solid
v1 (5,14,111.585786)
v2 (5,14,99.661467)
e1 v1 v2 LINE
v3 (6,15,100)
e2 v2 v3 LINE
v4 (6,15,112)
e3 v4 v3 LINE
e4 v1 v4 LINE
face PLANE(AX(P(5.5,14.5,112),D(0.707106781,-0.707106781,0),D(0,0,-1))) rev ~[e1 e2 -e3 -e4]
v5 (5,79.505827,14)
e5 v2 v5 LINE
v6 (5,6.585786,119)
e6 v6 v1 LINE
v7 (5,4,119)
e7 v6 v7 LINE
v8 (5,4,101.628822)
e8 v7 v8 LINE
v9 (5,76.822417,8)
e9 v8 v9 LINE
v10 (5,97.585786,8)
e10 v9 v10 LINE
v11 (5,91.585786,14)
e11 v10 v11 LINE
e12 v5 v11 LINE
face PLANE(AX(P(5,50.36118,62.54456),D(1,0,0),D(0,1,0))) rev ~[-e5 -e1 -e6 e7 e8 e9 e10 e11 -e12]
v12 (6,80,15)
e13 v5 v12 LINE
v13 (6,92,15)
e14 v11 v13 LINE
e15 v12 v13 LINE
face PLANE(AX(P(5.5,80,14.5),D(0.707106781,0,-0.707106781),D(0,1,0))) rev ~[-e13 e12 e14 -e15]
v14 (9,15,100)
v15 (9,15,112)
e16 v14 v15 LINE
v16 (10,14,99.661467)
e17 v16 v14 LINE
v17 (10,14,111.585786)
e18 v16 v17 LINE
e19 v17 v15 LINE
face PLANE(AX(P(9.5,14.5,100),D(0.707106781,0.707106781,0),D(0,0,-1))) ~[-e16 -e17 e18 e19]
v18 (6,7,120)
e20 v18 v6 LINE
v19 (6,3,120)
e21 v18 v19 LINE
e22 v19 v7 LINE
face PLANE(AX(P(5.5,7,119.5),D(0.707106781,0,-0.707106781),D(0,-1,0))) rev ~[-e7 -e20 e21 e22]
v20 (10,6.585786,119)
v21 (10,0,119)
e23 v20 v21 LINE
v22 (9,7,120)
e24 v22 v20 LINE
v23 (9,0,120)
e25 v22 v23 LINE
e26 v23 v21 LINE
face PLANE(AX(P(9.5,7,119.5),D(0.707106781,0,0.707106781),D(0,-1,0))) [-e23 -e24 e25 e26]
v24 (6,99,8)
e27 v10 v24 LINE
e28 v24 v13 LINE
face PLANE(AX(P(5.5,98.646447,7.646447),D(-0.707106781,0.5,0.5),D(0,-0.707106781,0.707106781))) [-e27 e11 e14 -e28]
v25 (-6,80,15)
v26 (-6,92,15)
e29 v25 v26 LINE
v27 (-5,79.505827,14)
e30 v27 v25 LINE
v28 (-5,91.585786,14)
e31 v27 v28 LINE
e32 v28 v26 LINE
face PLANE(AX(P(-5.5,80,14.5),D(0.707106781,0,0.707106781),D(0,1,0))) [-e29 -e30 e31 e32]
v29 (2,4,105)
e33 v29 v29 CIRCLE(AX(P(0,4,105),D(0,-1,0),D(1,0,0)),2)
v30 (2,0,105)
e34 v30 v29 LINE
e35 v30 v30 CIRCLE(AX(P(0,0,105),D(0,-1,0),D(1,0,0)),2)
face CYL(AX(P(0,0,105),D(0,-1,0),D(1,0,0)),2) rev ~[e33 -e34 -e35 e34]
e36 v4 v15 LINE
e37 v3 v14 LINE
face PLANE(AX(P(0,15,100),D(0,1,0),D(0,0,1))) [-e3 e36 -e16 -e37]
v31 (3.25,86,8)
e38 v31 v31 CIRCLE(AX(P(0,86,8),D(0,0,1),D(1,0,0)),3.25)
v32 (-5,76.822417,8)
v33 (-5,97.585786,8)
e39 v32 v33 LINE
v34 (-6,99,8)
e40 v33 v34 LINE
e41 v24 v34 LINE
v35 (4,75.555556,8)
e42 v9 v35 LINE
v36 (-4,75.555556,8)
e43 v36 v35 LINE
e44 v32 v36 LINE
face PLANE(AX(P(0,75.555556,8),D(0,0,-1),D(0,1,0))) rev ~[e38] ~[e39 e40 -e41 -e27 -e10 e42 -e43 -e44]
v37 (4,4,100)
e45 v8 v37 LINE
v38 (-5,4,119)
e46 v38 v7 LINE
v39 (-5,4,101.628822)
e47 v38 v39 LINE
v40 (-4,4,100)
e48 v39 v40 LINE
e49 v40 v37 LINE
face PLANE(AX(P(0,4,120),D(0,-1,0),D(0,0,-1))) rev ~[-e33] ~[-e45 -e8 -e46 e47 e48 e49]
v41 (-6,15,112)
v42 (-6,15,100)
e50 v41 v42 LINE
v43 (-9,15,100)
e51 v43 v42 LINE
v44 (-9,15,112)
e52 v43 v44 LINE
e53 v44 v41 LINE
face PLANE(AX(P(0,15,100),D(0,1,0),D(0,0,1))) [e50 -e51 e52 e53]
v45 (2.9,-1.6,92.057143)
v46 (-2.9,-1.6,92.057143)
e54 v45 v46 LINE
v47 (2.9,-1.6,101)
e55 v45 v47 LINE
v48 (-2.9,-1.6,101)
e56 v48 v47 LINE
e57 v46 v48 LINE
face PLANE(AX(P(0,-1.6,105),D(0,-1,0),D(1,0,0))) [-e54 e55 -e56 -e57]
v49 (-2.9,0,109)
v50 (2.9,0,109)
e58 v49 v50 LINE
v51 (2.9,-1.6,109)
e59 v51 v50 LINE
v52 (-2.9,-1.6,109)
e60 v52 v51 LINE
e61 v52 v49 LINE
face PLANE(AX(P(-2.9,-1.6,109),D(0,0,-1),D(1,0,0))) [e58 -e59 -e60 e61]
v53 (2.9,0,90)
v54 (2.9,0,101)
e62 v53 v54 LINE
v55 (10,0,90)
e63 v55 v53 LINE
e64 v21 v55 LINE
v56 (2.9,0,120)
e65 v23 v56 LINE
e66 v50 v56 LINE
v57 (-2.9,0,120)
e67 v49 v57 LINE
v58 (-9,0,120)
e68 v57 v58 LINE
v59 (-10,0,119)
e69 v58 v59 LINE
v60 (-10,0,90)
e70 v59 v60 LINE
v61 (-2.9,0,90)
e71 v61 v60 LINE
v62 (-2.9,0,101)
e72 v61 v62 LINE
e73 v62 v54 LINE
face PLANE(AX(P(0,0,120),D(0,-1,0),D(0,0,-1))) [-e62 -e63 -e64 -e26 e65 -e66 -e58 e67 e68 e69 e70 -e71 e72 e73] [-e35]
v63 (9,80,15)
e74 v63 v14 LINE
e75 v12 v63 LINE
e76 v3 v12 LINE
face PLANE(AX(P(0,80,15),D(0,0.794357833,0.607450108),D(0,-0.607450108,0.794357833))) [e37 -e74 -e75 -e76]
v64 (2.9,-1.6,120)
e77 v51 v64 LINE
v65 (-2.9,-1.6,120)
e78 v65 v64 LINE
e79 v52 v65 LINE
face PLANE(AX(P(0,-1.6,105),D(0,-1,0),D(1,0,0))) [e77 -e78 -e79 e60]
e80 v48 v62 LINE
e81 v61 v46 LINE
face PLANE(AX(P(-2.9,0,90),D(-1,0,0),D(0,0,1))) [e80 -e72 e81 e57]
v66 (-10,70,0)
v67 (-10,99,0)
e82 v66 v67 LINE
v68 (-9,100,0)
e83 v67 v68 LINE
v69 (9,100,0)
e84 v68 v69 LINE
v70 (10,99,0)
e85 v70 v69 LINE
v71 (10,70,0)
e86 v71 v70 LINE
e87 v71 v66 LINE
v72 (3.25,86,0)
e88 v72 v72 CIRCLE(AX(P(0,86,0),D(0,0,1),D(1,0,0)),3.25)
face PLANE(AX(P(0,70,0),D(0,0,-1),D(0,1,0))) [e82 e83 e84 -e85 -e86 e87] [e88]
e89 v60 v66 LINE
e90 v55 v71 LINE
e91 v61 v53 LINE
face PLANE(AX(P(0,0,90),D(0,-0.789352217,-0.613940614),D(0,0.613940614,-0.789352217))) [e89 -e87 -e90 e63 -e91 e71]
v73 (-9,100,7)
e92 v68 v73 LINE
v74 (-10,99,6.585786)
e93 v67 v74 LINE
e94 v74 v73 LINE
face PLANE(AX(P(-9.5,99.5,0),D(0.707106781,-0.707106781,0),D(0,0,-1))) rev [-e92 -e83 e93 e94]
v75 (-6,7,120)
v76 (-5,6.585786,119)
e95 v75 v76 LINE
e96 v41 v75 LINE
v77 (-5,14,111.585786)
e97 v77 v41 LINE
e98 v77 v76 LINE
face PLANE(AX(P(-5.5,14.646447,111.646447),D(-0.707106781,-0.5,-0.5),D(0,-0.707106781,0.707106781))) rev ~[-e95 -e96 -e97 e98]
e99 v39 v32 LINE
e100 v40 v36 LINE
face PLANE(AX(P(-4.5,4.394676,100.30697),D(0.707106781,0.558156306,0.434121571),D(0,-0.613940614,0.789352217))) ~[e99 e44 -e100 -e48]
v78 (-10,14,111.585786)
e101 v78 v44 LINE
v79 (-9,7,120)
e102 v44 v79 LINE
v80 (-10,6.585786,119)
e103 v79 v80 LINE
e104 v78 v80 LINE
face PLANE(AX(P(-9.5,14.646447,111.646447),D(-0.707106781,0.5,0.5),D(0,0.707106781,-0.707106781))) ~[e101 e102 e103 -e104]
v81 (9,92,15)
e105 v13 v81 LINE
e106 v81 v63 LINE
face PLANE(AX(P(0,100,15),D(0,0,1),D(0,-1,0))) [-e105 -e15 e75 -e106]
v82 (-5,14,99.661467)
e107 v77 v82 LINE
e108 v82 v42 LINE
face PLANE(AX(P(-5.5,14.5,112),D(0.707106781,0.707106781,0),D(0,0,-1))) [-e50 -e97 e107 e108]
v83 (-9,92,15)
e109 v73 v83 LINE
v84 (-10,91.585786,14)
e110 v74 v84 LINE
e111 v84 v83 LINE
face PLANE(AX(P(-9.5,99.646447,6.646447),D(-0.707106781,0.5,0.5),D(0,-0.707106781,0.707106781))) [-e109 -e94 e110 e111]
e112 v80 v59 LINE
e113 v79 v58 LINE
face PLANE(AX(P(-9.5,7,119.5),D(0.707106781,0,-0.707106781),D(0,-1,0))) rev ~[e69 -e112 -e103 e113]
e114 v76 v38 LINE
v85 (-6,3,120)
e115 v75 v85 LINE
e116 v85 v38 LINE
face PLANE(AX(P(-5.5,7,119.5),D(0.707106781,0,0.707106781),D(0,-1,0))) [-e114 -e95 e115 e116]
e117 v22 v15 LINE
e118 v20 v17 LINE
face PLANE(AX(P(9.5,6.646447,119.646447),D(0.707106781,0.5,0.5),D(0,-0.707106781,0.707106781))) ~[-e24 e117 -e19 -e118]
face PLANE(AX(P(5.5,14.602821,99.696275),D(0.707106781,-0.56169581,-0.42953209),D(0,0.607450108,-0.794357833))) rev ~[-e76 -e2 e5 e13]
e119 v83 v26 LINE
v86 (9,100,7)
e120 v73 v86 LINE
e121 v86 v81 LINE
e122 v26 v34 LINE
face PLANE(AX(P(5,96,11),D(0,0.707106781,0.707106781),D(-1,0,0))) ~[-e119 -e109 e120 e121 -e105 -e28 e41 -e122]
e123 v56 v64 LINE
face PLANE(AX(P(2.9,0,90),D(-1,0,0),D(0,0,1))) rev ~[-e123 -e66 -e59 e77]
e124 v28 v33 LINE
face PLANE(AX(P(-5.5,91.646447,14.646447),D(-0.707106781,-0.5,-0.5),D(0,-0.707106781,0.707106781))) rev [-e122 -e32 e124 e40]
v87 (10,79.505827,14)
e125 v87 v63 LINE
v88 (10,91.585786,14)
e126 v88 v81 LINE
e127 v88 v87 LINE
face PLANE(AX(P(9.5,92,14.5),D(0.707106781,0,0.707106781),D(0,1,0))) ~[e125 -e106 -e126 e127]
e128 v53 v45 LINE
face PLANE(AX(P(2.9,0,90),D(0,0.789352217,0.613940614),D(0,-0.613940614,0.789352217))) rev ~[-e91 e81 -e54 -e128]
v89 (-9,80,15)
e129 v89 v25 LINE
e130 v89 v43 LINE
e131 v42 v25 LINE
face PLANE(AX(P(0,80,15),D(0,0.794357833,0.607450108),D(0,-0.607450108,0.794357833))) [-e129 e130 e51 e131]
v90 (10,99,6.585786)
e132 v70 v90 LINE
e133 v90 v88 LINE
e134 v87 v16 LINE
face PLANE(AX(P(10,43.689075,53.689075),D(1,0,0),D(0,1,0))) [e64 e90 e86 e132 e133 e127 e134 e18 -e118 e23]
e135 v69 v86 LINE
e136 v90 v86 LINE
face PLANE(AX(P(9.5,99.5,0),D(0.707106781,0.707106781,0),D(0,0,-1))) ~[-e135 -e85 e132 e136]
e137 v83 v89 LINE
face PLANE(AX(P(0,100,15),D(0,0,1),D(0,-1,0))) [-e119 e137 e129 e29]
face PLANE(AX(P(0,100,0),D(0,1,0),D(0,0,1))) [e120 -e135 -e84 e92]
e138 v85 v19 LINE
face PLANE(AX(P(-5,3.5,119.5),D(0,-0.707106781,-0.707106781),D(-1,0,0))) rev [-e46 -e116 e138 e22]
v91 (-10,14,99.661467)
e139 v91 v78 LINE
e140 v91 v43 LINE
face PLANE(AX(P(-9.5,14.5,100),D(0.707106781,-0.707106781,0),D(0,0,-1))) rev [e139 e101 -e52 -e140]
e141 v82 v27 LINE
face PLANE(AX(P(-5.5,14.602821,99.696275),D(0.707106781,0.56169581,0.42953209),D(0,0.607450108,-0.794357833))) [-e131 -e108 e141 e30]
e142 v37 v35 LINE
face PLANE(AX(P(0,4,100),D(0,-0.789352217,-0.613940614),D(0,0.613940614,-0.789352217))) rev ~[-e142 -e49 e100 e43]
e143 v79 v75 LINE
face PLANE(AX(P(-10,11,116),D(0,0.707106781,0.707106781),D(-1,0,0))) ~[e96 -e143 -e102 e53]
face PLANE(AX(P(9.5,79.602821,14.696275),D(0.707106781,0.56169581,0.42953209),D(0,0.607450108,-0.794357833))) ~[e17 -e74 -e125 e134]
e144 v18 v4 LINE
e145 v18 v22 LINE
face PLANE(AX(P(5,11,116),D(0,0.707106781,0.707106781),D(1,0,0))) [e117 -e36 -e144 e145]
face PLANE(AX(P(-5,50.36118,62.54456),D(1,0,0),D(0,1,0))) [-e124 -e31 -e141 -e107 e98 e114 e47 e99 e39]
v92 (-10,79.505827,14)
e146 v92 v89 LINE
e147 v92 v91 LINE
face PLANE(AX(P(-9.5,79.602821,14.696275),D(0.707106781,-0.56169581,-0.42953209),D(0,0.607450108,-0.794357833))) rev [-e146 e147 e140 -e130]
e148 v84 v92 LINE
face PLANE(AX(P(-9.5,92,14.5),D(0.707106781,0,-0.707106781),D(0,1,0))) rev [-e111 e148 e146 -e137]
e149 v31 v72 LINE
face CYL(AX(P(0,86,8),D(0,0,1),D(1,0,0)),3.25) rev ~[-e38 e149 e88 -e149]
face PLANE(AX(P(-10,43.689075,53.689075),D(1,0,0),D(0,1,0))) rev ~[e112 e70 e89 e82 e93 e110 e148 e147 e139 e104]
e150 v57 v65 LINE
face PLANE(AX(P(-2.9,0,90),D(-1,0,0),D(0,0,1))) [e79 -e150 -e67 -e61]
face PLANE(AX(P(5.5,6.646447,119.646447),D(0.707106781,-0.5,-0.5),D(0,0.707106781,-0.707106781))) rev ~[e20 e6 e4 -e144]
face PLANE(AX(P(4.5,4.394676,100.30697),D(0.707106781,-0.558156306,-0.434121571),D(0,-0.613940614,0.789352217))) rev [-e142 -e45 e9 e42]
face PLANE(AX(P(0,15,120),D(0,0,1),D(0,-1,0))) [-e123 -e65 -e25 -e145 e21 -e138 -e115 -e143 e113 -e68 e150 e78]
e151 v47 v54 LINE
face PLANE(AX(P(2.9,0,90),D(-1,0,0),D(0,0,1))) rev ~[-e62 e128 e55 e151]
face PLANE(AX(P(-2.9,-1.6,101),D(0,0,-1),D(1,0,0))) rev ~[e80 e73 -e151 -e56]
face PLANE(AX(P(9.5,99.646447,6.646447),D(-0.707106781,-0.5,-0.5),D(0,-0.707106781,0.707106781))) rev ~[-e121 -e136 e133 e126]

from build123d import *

# Parameters (mm, degrees)
F1_DEPTH    = 10
F2_W        = 5.8
F2_H        = 30
F3_DEPTH    = 1.6
F4_W        = 5.8
F4_H        = 8
F5_DEPTH    = 1.6
F6_R        = 2
F7_DEPTH    = 15
F9_DEPTH    = 5
F10_R       = 3.25
F11_DEPTH   = 8
F13_DEPTH   = 5.8
F14_C1_SIZE = 8
F14_C2_SIZE = 8
F14_C3_SIZE = 8
F15_SIZE    = 1


with BuildPart() as f1:
    # F0 (on Right) → F1 (new body, symmetric)
    with BuildSketch(Plane.YZ):
        Polygon((70, 0), (100, 0), (100, 15), (80, 15), (15, 100), (15, 120), (0, 120), (0, 90), align=None)
    extrude(amount=F1_DEPTH, both=True)

    # F2 (on face) → F3 (join)
    with BuildSketch(Plane.XZ):
        with Locations((0, 105)):
            Rectangle(F2_W, F2_H)
    extrude(amount=F3_DEPTH)

    # F4 (on face) → F5 (cut, through all)
    with BuildSketch(Plane.XZ.offset(1.6)):
        with Locations((0, 105)):
            Rectangle(F4_W, F4_H)
    extrude(amount=-F5_DEPTH, mode=Mode.SUBTRACT)

    # F6 (on face) → F7 (cut, through all)
    with BuildSketch(Plane.XZ):
        with Locations((0, 105)):
            Circle(F6_R)
    extrude(amount=-F7_DEPTH, mode=Mode.SUBTRACT)

    # F8 (on Right) → F9 (cut, symmetric)
    with BuildSketch(Plane.YZ):
        Polygon((21.8223074079, 120), (4, 120), (4, 100), (75.5555555556, 8), (100, 8), (100, 19.4858238101), align=None)
    extrude(amount=F9_DEPTH, both=True, mode=Mode.SUBTRACT)

    # F10 (on face) → F11 (cut, through all)
    with BuildSketch(Plane.XY.offset(8)):
        with Locations((0, 86)):
            Circle(F10_R)
    extrude(amount=-F11_DEPTH, mode=Mode.SUBTRACT)

    # F12 (on face) → F13 (cut, through all)
    with BuildSketch(Plane.YZ.offset(2.9)):
        Polygon((-1.6, 90), (0, 90), (-1.6, 92.0571428571), align=None)
    extrude(amount=-F13_DEPTH, mode=Mode.SUBTRACT)

    # F14: chamfer of 8 on 4 edges, made by hand

    # F14_c1
    f14_c1_edges = [f1.edges().sort_by_distance(p)[0] for p in [
        (7.5, 100, 15),
    ]]
    chamfer(f14_c1_edges, length=F14_C1_SIZE)

    # F14_c2
    f14_c2_edges = [f1.edges().sort_by_distance(p)[0] for p in [
        (-7.5, 15, 120),
    ]]
    chamfer(f14_c2_edges, length=F14_C2_SIZE)

    # F14_c3
    f14_c3_edges = [f1.edges().sort_by_distance(p)[0] for p in [
        (7.5, 15, 120),
    ]]
    chamfer(f14_c3_edges, length=F14_C3_SIZE)

    # F15
    f15_edges = [f1.edges().sort_by_distance(p)[0] for p in [
        (10, 47.5, 57.5),
        (5, 47.5, 57.5),
        (10, 15, 106),
        (5, 15, 106),
        (-5, 15, 106),
        (-10, 15, 106),
        (-5, 47.5, 57.5),
        (-10, 47.5, 57.5),
        (10, 86, 15),
        (5, 86, 15),
        (-5, 86, 15),
        (-10, 86, 15),
        (-10, 100, 3.5),
        (10, 100, 3.5),
        (10, 3.5, 120),
        (5, 5.5, 120),
        (-5, 5.5, 120),
        (-10, 3.5, 120),
        (0, 4, 120),
        (5, 39.777778, 54),
        (-5, 39.777778, 54),
        (10, 96, 11),
        (5, 95.5, 11.5),
        (-5, 95.5, 11.5),
        (-10, 96, 11),
        (10, 11, 116),
        (5, 11, 116),
        (-5, 11, 116),
        (-10, 11, 116),
    ]]
    chamfer(f15_edges, length=F15_SIZE)


solid = f1.part
